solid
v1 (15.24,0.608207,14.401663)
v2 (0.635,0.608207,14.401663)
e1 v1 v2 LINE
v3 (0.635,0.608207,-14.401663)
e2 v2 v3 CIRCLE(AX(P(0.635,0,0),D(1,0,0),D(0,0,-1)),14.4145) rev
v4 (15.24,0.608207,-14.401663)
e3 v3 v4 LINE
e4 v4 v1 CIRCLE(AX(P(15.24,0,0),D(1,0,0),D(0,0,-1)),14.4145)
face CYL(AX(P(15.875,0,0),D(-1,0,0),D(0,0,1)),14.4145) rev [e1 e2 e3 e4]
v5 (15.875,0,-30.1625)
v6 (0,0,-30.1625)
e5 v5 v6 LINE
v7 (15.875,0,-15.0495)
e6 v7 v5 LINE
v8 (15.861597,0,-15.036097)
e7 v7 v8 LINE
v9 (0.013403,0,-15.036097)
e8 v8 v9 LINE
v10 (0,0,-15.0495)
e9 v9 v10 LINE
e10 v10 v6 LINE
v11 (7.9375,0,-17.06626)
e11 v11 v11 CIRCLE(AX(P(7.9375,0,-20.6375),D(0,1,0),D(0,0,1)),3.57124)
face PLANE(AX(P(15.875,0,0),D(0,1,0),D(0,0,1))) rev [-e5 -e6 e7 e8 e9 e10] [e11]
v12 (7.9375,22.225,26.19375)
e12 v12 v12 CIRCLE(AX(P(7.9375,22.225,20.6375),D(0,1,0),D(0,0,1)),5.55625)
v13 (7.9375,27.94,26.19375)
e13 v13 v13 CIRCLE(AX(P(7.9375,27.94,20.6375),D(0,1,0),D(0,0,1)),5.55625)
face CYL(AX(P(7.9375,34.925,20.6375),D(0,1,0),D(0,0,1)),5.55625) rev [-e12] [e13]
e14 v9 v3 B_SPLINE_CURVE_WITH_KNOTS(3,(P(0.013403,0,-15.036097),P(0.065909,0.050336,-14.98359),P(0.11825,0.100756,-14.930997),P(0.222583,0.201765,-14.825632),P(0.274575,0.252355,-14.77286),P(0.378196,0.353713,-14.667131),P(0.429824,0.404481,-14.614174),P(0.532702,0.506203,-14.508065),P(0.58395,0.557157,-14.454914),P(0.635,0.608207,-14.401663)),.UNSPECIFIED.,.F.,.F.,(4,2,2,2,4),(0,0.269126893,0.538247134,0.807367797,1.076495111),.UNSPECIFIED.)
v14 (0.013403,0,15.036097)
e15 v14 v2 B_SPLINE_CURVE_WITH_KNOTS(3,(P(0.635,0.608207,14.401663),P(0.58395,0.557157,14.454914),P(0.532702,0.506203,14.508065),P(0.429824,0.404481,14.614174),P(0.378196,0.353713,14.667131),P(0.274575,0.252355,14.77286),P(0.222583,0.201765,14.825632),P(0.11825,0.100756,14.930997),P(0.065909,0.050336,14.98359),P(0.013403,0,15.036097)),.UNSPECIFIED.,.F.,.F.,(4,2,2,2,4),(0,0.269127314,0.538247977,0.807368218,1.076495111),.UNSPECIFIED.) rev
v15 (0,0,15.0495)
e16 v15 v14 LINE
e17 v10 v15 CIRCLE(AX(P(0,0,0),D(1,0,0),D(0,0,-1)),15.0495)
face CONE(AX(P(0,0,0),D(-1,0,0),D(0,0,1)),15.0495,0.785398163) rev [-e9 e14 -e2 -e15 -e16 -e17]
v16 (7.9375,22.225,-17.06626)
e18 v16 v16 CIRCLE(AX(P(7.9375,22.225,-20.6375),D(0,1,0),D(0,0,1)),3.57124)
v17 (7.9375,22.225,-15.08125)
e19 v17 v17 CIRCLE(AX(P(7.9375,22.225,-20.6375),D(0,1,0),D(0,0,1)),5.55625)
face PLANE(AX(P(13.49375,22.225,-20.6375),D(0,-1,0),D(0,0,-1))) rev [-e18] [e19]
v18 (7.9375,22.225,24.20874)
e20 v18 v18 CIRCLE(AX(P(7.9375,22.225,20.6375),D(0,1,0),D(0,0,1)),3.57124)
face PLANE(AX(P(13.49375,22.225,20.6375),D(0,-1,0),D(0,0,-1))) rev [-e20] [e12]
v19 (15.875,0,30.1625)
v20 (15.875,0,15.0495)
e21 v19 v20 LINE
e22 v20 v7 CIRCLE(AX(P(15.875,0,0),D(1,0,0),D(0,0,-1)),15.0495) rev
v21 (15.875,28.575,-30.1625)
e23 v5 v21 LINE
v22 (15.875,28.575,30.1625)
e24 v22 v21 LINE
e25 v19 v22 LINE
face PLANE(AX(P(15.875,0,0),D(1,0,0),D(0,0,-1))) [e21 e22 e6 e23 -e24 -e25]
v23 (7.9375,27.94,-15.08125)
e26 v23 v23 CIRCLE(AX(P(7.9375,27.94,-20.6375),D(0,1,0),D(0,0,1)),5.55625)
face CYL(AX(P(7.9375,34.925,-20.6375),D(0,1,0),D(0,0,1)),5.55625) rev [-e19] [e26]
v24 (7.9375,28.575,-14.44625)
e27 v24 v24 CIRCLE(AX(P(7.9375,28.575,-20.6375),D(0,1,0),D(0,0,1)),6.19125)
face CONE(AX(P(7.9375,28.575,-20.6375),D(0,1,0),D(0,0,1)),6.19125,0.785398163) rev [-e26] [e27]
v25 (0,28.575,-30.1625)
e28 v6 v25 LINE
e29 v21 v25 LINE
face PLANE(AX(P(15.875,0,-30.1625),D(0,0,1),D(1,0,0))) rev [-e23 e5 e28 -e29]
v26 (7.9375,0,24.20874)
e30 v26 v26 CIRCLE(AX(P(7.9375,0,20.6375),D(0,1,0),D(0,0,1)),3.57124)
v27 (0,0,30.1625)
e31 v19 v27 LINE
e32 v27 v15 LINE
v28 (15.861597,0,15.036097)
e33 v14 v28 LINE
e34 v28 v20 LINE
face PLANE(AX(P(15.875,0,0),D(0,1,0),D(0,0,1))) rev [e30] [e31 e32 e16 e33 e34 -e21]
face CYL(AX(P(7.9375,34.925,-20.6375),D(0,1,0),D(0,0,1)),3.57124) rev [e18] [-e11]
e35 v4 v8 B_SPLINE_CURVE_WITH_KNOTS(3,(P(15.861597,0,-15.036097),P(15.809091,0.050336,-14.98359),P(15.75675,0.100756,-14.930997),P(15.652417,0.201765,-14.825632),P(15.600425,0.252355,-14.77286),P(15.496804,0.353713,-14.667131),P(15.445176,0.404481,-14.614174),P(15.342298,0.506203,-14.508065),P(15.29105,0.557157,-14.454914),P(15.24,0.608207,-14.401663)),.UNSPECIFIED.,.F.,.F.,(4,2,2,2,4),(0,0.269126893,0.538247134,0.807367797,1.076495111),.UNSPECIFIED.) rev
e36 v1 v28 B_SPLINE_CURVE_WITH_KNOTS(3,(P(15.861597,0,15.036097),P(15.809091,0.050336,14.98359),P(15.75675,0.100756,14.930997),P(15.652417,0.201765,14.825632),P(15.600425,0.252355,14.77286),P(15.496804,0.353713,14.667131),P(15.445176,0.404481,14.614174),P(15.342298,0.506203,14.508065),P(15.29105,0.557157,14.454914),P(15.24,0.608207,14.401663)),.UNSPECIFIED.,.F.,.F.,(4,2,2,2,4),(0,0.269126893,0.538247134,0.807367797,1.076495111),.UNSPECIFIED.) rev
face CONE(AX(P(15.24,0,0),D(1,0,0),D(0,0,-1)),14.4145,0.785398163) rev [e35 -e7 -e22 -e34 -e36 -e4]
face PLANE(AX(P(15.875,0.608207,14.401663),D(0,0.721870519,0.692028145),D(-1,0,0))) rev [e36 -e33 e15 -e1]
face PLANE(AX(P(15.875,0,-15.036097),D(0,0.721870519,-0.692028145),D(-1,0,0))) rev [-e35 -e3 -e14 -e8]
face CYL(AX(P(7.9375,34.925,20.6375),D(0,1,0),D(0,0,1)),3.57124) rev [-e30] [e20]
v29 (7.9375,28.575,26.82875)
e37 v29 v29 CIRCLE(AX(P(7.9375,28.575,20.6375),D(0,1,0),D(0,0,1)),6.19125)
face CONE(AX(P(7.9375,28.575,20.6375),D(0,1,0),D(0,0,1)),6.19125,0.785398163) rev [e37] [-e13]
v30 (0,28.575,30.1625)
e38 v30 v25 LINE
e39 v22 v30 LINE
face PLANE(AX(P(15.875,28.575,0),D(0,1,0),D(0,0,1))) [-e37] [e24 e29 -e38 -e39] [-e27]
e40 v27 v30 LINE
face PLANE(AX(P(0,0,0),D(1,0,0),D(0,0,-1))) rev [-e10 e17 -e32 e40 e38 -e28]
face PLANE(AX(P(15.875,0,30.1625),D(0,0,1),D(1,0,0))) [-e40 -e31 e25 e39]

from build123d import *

# Parameters (mm, degrees)
BOSS_EXTRUDE1_DEPTH                           = 15.875
BOSS_EXTRUDE2_DEPTH                           = 15.875
CBORE_FOR_1_4_SOCKET_HEAD_CAP_SCREW1_AT_COUNT = 2
CBORE_FOR_1_4_SOCKET_HEAD_CAP_SCREW1_AT_PITCH = 41.275
MOVE_FACE1_BY                                 = 0.127
MOVE_FACE1_2_BY                               = 0.127
MOVE_START                                    = 28.575
MOVE_FACE2_OUTLINE_W                          = 15.875
MOVE_FACE2_OUTLINE_H                          = 60.325
MOVE_FACE2_OUTLINE_R                          = 5.55625
MOVE_FACE2_DEPTH                              = 6.35
MOVE_START_2                                  = 22.225
MOVE_FACE2_2_OUTLINE_R                        = 5.55625
MOVE_FACE2_2_OUTLINE_R_2                      = 3.57124
MOVE_FACE2_2_DEPTH                            = 6.35


with BuildPart() as part:
    # Sketch1 → Boss-Extrude1 (new body)
    with BuildSketch(Plane(origin=(0, 0, 0), x_dir=(0, 0, -1), z_dir=(1, 0, 0))):
        with BuildLine():
            Line((30.1625, 0), (14.2875, 0))
            ThreePointArc((14.2875, 0), (0, -14.2875), (-14.2875, 0))
            Line((-14.2875, 0), (-30.1625, 0))
            Line((-30.1625, 0), (-30.1625, -34.925))
            Line((-30.1625, -34.925), (30.1625, -34.925))
            Line((30.1625, -34.925), (30.1625, 0))
        make_face()
    extrude(amount=BOSS_EXTRUDE1_DEPTH)


with BuildPart() as body_2:
    # Sketch1<3> → Boss-Extrude2 (new body)
    with BuildSketch(Plane(origin=(0, 0, 0), x_dir=(0, 0, -1), z_dir=(1, 0, 0))):
        with BuildLine():
            ThreePointArc((-14.2875, 0), (0, 14.2875), (14.2875, 0))
            Line((14.2875, 0), (30.1625, 0))
            Line((30.1625, 0), (30.1625, 34.925))
            Line((30.1625, 34.925), (-30.1625, 34.925))
            Line((-30.1625, 34.925), (-30.1625, 0))
            Line((-30.1625, 0), (-14.2875, 0))
        make_face()
    extrude(amount=BOSS_EXTRUDE2_DEPTH)


with BuildPart() as cbore_for_1_4_socket_head_cap_screw1_tool:
    # Sketch4 → CBORE for 1/4 Socket Head Cap Screw1 (revolve)
    with BuildSketch(Plane(origin=(7.9375, 34.925, 20.6375), x_dir=(0, 0, 1), z_dir=(1, 0, 0))):
        Polygon((0, 0), (0, 69.85), (3.57124, 69.85), (3.57124, 6.35), (5.55625, 6.35), (5.55625, 0.635), (6.19125, 0), align=None)
    cbore_for_1_4_socket_head_cap_screw1 = revolve(axis=Axis((7.9375, 41.275, 20.6375), (0, -1, 0)))


with BuildPart() as part_1:
    add(part.part)

    # CBORE for 1/4 Socket Head Cap Screw1: cut by cbore_for_1_4_socket_head_cap_screw1_tool
    add(cbore_for_1_4_socket_head_cap_screw1_tool.part, mode=Mode.SUBTRACT)


with BuildPart() as body_2_1:
    add(body_2.part)

    # CBORE for 1/4 Socket Head Cap Screw1: cut by cbore_for_1_4_socket_head_cap_screw1_tool
    add(cbore_for_1_4_socket_head_cap_screw1_tool.part, mode=Mode.SUBTRACT)


with BuildPart() as cbore_for_1_4_socket_head_cap_screw1_at_tool:
    # CBORE for 1/4 Socket Head Cap Screw1 at: CBORE for 1/4 Socket Head Cap Screw1 ×2
    with Locations(*[(0, 0, -i * CBORE_FOR_1_4_SOCKET_HEAD_CAP_SCREW1_AT_PITCH) for i in range(1, CBORE_FOR_1_4_SOCKET_HEAD_CAP_SCREW1_AT_COUNT)]):
        add(cbore_for_1_4_socket_head_cap_screw1)


with BuildPart() as part_2:
    add(part_1.part)

    # CBORE for 1/4 Socket Head Cap Screw1 at: cut by cbore_for_1_4_socket_head_cap_screw1_at_tool
    add(cbore_for_1_4_socket_head_cap_screw1_at_tool.part, mode=Mode.SUBTRACT)

    # Move Face1 2: a curved face moved inward by 0.127
    add(Solid.thicken(part_2.faces().sort_by_distance((7.9375, -14.2875, 0))[0], -MOVE_FACE1_2_BY), mode=Mode.SUBTRACT)

    # Chamfer2
    # the kernel refuses this chamfer: 0.635 mm, written as the material it takes off along each edge
    with BuildSketch(Plane(origin=(0, 0, 0), x_dir=(0, 0.1132288377802066, -0.9935689358544497), z_dir=(0, 0.9935689358544497, 0.1132288377802066))) as chamfer2_piece_1:
        with BuildLine():
            Line((15.067460512, 0.017960512), (14.396539488, -0.652960512))
            Line((14.396539488, -0.652960512), (14.383839488, -0.652960512))
            ThreePointArc((14.383839488, -0.652960512), (14.4018, -0.326480256), (14.4018, 0))
            Line((14.4018, 0), (14.4145, 0.0127))
            ThreePointArc((14.4145, 0.0127), (14.740980256, 0.0127), (15.067460512, 0.030660512))
            Line((15.067460512, 0.030660512), (15.067460512, 0.017960512))
        make_face()
    revolve(axis=Axis((0, 0, 0), (-1, 0, 0)), revolution_arc=193.002955297, mode=Mode.SUBTRACT)
    with BuildSketch(Plane(origin=(-1.600435701, 0, -14.4145), x_dir=(0, 0, -1), z_dir=(1, 0, 0))) as chamfer2_piece_2:
        with BuildLine():
            Line((0.639932919, 0.017577515), (-0.031172593, -0.625784266))
            Line((-0.031172593, -0.625784266), (-0.043861283, -0.625248401))
            ThreePointArc((-0.043861283, -0.625248401), (-0.016099091, -0.31288099), (-0.0127, 0))
            Line((-0.0127, 0), (0, 0.0127))
            ThreePointArc((0, 0.0127), (0.319966459, 0.0127), (0.639932919, 0.030277515))
            Line((0.639932919, 0.030277515), (0.639932919, 0.017577515))
        make_face()
    extrude(amount=19.075871403, mode=Mode.SUBTRACT)
    with BuildSketch(Plane(origin=(-1.600435701, 0, 14.4145), x_dir=(0, -0.999777333387341, -0.021101745067597762), z_dir=(1, 0, 0))) as chamfer2_piece_3:
        with BuildLine():
            Line((0.626302721, 0.017960512), (-0.031077302, -0.639419511))
            Line((-0.031077302, -0.639419511), (-0.043774474, -0.639151519))
            ThreePointArc((-0.043774474, -0.639151519), (-0.019449023, -0.319627221), (-0.012697172, 0.000267992))
            Line((-0.012697172, 0.000267992), (0.000267992, 0.012697172))
            ThreePointArc((0.000267992, 0.012697172), (0.313151041, 0.009493172), (0.626034729, 0.030657684))
            Line((0.626034729, 0.030657684), (0.626302721, 0.017960512))
        make_face()
    extrude(amount=19.075871403, mode=Mode.SUBTRACT)
    with BuildSketch(Plane(origin=(15.875, 0, 0), x_dir=(0, 0.11322883778020662, -0.9935689358544497), z_dir=(0, 0.9935689358544497, 0.11322883778020662))) as chamfer2_piece_4:
        with BuildLine():
            Line((14.396539488, 0.652960512), (15.067460512, -0.017960512))
            Line((15.067460512, -0.017960512), (15.067460512, -0.030660512))
            ThreePointArc((15.067460512, -0.030660512), (14.740980256, -0.0127), (14.4145, -0.0127))
            Line((14.4145, -0.0127), (14.4018, 0))
            ThreePointArc((14.4018, 0), (14.4018, 0.326480256), (14.383839488, 0.652960512))
            Line((14.383839488, 0.652960512), (14.396539488, 0.652960512))
        make_face()
    revolve(axis=Axis((15.875, 0, 0), (-1, 0, 0)), revolution_arc=193.002955297, mode=Mode.SUBTRACT)


with BuildPart() as body_2_2:
    add(body_2_1.part)

    # CBORE for 1/4 Socket Head Cap Screw1 at: cut by cbore_for_1_4_socket_head_cap_screw1_at_tool
    add(cbore_for_1_4_socket_head_cap_screw1_at_tool.part, mode=Mode.SUBTRACT)

    # Move Face1: a curved face moved inward by 0.127
    add(Solid.thicken(body_2_2.faces().sort_by_distance((7.9375, 14.2875, 0))[0], -MOVE_FACE1_BY), mode=Mode.SUBTRACT)

    # Move Face2: read off the stored shape, not the designer's step
    # Move Face2 outline → Move Face2 (cut)
    with BuildSketch(Plane(origin=(0, 0, 0), x_dir=(1, 0, 0), z_dir=(0, 1, 0)).offset(MOVE_START)):
        with Locations((7.9375, 0)):
            Rectangle(MOVE_FACE2_OUTLINE_W, MOVE_FACE2_OUTLINE_H)
        with Locations((7.9375, -20.6375)):
            Circle(MOVE_FACE2_OUTLINE_R, mode=Mode.SUBTRACT)
        with Locations((7.9375, 20.6375)):
            Circle(MOVE_FACE2_OUTLINE_R, mode=Mode.SUBTRACT)
    extrude(amount=MOVE_FACE2_DEPTH, mode=Mode.SUBTRACT)

    # Move Face2 2 outline → Move Face2 2 (cut)
    # profile 1 of 2: a face of its own
    with BuildSketch(Plane(origin=(0, 0, 0), x_dir=(1, 0, 0), z_dir=(0, 1, 0)).offset(MOVE_START_2)):
        with Locations((7.9375, 20.6375)):
            Circle(MOVE_FACE2_2_OUTLINE_R)
        with Locations((7.9375, 20.6375)):
            Circle(MOVE_FACE2_2_OUTLINE_R_2, mode=Mode.SUBTRACT)
    # profile 2 of 2: a face of its own
    with BuildSketch(Plane(origin=(0, 0, 0), x_dir=(1, 0, 0), z_dir=(0, 1, 0)).offset(MOVE_START_2)):
        with Locations((7.9375, -20.6375)):
            Circle(MOVE_FACE2_2_OUTLINE_R)
        with Locations((7.9375, -20.6375)):
            Circle(MOVE_FACE2_2_OUTLINE_R_2, mode=Mode.SUBTRACT)
    extrude(amount=MOVE_FACE2_2_DEPTH, mode=Mode.SUBTRACT)

    # Move Face2 3: loft between two sections, ruled curve by curve
    move_face2_3_from = [
        Edge.make_three_point_arc((7.9375, 27.94, -15.08125), (13.49375, 27.94, -20.6375), (7.9375, 27.94, -26.19375)),
        Edge.make_three_point_arc((7.9375, 27.94, -26.19375), (2.38125, 27.94, -20.6375), (7.9375, 27.94, -15.08125)),
    ]
    move_face2_3_to = [
        Edge.make_three_point_arc((7.9375, 28.575, -14.44625), (14.12875, 28.575, -20.6375), (7.9375, 28.575, -26.82875)),
        Edge.make_three_point_arc((7.9375, 28.575, -26.82875), (1.74625, 28.575, -20.6375), (7.9375, 28.575, -14.44625)),
    ]
    move_face2_3 = Solid(Shell([*[Face.make_surface_from_curves(move_face2_3_from[k], move_face2_3_to[k]) for k in range(2)], Face(Wire(move_face2_3_from)), Face(Wire(move_face2_3_to))]))
    add(move_face2_3, mode=Mode.SUBTRACT)

    # Move Face2 4: loft between two sections, ruled curve by curve
    move_face2_4_from = [
        Edge.make_three_point_arc((7.9375, 27.94, 26.19375), (13.49375, 27.94, 20.6375), (7.9375, 27.94, 15.08125)),
        Edge.make_three_point_arc((7.9375, 27.94, 15.08125), (2.38125, 27.94, 20.6375), (7.9375, 27.94, 26.19375)),
    ]
    move_face2_4_to = [
        Edge.make_three_point_arc((7.9375, 28.575, 26.82875), (14.12875, 28.575, 20.6375), (7.9375, 28.575, 14.44625)),
        Edge.make_three_point_arc((7.9375, 28.575, 14.44625), (1.74625, 28.575, 20.6375), (7.9375, 28.575, 26.82875)),
    ]
    move_face2_4 = Solid(Shell([*[Face.make_surface_from_curves(move_face2_4_from[k], move_face2_4_to[k]) for k in range(2)], Face(Wire(move_face2_4_from)), Face(Wire(move_face2_4_to))]))
    add(move_face2_4, mode=Mode.SUBTRACT)

    # Chamfer1
    # the kernel refuses this chamfer: 0.635 mm, written as the material it takes off along each edge
    with BuildSketch(Plane(origin=(0, 0, 0), x_dir=(0, -0.11322883778020673, 0.9935689358544497), z_dir=(0, -0.9935689358544497, -0.11322883778020673))) as chamfer1_piece_1:
        with BuildLine():
            Line((15.067460512, 0.017960512), (14.396539488, -0.652960512))
            Line((14.396539488, -0.652960512), (14.383839488, -0.652960512))
            ThreePointArc((14.383839488, -0.652960512), (14.4018, -0.326480256), (14.4018, 0))
            Line((14.4018, 0), (14.4145, 0.0127))
            ThreePointArc((14.4145, 0.0127), (14.740980256, 0.0127), (15.067460512, 0.030660512))
            Line((15.067460512, 0.030660512), (15.067460512, 0.017960512))
        make_face()
    revolve(axis=Axis((0, 0, 0), (-1, 0, 0)), revolution_arc=193.002955297, mode=Mode.SUBTRACT)
    with BuildSketch(Plane(origin=(-1.600435701, 0, 14.4145), x_dir=(0, 0, 1), z_dir=(1, 0, 0))) as chamfer1_piece_2:
        with BuildLine():
            Line((0.639932919, 0.017577515), (-0.031172593, -0.625784266))
            Line((-0.031172593, -0.625784266), (-0.043861283, -0.625248401))
            ThreePointArc((-0.043861283, -0.625248401), (-0.016099091, -0.31288099), (-0.0127, 0))
            Line((-0.0127, 0), (0, 0.0127))
            ThreePointArc((0, 0.0127), (0.319966459, 0.0127), (0.639932919, 0.030277515))
            Line((0.639932919, 0.030277515), (0.639932919, 0.017577515))
        make_face()
    extrude(amount=19.075871403, mode=Mode.SUBTRACT)
    with BuildSketch(Plane(origin=(-1.600435701, 0, -14.4145), x_dir=(0, 0.999777333387341, 0.021101745067597762), z_dir=(1, 0, 0))) as chamfer1_piece_3:
        with BuildLine():
            Line((0.626302721, 0.017960512), (-0.031077302, -0.639419511))
            Line((-0.031077302, -0.639419511), (-0.043774474, -0.639151519))
            ThreePointArc((-0.043774474, -0.639151519), (-0.019449023, -0.319627221), (-0.012697172, 0.000267992))
            Line((-0.012697172, 0.000267992), (0.000267992, 0.012697172))
            ThreePointArc((0.000267992, 0.012697172), (0.313151041, 0.009493172), (0.626034729, 0.030657684))
            Line((0.626034729, 0.030657684), (0.626302721, 0.017960512))
        make_face()
    extrude(amount=19.075871403, mode=Mode.SUBTRACT)
    with BuildSketch(Plane(origin=(15.875, 0, 0), x_dir=(0, -0.11322883778020675, 0.9935689358544497), z_dir=(0, -0.9935689358544497, -0.11322883778020675))) as chamfer1_piece_4:
        with BuildLine():
            Line((14.396539488, 0.652960512), (15.067460512, -0.017960512))
            Line((15.067460512, -0.017960512), (15.067460512, -0.030660512))
            ThreePointArc((15.067460512, -0.030660512), (14.740980256, -0.0127), (14.4145, -0.0127))
            Line((14.4145, -0.0127), (14.4018, 0))
            ThreePointArc((14.4018, 0), (14.4018, 0.326480256), (14.383839488, 0.652960512))
            Line((14.383839488, 0.652960512), (14.396539488, 0.652960512))
        make_face()
    revolve(axis=Axis((15.875, 0, 0), (-1, 0, 0)), revolution_arc=193.002955297, mode=Mode.SUBTRACT)


solid = body_2_2.part
